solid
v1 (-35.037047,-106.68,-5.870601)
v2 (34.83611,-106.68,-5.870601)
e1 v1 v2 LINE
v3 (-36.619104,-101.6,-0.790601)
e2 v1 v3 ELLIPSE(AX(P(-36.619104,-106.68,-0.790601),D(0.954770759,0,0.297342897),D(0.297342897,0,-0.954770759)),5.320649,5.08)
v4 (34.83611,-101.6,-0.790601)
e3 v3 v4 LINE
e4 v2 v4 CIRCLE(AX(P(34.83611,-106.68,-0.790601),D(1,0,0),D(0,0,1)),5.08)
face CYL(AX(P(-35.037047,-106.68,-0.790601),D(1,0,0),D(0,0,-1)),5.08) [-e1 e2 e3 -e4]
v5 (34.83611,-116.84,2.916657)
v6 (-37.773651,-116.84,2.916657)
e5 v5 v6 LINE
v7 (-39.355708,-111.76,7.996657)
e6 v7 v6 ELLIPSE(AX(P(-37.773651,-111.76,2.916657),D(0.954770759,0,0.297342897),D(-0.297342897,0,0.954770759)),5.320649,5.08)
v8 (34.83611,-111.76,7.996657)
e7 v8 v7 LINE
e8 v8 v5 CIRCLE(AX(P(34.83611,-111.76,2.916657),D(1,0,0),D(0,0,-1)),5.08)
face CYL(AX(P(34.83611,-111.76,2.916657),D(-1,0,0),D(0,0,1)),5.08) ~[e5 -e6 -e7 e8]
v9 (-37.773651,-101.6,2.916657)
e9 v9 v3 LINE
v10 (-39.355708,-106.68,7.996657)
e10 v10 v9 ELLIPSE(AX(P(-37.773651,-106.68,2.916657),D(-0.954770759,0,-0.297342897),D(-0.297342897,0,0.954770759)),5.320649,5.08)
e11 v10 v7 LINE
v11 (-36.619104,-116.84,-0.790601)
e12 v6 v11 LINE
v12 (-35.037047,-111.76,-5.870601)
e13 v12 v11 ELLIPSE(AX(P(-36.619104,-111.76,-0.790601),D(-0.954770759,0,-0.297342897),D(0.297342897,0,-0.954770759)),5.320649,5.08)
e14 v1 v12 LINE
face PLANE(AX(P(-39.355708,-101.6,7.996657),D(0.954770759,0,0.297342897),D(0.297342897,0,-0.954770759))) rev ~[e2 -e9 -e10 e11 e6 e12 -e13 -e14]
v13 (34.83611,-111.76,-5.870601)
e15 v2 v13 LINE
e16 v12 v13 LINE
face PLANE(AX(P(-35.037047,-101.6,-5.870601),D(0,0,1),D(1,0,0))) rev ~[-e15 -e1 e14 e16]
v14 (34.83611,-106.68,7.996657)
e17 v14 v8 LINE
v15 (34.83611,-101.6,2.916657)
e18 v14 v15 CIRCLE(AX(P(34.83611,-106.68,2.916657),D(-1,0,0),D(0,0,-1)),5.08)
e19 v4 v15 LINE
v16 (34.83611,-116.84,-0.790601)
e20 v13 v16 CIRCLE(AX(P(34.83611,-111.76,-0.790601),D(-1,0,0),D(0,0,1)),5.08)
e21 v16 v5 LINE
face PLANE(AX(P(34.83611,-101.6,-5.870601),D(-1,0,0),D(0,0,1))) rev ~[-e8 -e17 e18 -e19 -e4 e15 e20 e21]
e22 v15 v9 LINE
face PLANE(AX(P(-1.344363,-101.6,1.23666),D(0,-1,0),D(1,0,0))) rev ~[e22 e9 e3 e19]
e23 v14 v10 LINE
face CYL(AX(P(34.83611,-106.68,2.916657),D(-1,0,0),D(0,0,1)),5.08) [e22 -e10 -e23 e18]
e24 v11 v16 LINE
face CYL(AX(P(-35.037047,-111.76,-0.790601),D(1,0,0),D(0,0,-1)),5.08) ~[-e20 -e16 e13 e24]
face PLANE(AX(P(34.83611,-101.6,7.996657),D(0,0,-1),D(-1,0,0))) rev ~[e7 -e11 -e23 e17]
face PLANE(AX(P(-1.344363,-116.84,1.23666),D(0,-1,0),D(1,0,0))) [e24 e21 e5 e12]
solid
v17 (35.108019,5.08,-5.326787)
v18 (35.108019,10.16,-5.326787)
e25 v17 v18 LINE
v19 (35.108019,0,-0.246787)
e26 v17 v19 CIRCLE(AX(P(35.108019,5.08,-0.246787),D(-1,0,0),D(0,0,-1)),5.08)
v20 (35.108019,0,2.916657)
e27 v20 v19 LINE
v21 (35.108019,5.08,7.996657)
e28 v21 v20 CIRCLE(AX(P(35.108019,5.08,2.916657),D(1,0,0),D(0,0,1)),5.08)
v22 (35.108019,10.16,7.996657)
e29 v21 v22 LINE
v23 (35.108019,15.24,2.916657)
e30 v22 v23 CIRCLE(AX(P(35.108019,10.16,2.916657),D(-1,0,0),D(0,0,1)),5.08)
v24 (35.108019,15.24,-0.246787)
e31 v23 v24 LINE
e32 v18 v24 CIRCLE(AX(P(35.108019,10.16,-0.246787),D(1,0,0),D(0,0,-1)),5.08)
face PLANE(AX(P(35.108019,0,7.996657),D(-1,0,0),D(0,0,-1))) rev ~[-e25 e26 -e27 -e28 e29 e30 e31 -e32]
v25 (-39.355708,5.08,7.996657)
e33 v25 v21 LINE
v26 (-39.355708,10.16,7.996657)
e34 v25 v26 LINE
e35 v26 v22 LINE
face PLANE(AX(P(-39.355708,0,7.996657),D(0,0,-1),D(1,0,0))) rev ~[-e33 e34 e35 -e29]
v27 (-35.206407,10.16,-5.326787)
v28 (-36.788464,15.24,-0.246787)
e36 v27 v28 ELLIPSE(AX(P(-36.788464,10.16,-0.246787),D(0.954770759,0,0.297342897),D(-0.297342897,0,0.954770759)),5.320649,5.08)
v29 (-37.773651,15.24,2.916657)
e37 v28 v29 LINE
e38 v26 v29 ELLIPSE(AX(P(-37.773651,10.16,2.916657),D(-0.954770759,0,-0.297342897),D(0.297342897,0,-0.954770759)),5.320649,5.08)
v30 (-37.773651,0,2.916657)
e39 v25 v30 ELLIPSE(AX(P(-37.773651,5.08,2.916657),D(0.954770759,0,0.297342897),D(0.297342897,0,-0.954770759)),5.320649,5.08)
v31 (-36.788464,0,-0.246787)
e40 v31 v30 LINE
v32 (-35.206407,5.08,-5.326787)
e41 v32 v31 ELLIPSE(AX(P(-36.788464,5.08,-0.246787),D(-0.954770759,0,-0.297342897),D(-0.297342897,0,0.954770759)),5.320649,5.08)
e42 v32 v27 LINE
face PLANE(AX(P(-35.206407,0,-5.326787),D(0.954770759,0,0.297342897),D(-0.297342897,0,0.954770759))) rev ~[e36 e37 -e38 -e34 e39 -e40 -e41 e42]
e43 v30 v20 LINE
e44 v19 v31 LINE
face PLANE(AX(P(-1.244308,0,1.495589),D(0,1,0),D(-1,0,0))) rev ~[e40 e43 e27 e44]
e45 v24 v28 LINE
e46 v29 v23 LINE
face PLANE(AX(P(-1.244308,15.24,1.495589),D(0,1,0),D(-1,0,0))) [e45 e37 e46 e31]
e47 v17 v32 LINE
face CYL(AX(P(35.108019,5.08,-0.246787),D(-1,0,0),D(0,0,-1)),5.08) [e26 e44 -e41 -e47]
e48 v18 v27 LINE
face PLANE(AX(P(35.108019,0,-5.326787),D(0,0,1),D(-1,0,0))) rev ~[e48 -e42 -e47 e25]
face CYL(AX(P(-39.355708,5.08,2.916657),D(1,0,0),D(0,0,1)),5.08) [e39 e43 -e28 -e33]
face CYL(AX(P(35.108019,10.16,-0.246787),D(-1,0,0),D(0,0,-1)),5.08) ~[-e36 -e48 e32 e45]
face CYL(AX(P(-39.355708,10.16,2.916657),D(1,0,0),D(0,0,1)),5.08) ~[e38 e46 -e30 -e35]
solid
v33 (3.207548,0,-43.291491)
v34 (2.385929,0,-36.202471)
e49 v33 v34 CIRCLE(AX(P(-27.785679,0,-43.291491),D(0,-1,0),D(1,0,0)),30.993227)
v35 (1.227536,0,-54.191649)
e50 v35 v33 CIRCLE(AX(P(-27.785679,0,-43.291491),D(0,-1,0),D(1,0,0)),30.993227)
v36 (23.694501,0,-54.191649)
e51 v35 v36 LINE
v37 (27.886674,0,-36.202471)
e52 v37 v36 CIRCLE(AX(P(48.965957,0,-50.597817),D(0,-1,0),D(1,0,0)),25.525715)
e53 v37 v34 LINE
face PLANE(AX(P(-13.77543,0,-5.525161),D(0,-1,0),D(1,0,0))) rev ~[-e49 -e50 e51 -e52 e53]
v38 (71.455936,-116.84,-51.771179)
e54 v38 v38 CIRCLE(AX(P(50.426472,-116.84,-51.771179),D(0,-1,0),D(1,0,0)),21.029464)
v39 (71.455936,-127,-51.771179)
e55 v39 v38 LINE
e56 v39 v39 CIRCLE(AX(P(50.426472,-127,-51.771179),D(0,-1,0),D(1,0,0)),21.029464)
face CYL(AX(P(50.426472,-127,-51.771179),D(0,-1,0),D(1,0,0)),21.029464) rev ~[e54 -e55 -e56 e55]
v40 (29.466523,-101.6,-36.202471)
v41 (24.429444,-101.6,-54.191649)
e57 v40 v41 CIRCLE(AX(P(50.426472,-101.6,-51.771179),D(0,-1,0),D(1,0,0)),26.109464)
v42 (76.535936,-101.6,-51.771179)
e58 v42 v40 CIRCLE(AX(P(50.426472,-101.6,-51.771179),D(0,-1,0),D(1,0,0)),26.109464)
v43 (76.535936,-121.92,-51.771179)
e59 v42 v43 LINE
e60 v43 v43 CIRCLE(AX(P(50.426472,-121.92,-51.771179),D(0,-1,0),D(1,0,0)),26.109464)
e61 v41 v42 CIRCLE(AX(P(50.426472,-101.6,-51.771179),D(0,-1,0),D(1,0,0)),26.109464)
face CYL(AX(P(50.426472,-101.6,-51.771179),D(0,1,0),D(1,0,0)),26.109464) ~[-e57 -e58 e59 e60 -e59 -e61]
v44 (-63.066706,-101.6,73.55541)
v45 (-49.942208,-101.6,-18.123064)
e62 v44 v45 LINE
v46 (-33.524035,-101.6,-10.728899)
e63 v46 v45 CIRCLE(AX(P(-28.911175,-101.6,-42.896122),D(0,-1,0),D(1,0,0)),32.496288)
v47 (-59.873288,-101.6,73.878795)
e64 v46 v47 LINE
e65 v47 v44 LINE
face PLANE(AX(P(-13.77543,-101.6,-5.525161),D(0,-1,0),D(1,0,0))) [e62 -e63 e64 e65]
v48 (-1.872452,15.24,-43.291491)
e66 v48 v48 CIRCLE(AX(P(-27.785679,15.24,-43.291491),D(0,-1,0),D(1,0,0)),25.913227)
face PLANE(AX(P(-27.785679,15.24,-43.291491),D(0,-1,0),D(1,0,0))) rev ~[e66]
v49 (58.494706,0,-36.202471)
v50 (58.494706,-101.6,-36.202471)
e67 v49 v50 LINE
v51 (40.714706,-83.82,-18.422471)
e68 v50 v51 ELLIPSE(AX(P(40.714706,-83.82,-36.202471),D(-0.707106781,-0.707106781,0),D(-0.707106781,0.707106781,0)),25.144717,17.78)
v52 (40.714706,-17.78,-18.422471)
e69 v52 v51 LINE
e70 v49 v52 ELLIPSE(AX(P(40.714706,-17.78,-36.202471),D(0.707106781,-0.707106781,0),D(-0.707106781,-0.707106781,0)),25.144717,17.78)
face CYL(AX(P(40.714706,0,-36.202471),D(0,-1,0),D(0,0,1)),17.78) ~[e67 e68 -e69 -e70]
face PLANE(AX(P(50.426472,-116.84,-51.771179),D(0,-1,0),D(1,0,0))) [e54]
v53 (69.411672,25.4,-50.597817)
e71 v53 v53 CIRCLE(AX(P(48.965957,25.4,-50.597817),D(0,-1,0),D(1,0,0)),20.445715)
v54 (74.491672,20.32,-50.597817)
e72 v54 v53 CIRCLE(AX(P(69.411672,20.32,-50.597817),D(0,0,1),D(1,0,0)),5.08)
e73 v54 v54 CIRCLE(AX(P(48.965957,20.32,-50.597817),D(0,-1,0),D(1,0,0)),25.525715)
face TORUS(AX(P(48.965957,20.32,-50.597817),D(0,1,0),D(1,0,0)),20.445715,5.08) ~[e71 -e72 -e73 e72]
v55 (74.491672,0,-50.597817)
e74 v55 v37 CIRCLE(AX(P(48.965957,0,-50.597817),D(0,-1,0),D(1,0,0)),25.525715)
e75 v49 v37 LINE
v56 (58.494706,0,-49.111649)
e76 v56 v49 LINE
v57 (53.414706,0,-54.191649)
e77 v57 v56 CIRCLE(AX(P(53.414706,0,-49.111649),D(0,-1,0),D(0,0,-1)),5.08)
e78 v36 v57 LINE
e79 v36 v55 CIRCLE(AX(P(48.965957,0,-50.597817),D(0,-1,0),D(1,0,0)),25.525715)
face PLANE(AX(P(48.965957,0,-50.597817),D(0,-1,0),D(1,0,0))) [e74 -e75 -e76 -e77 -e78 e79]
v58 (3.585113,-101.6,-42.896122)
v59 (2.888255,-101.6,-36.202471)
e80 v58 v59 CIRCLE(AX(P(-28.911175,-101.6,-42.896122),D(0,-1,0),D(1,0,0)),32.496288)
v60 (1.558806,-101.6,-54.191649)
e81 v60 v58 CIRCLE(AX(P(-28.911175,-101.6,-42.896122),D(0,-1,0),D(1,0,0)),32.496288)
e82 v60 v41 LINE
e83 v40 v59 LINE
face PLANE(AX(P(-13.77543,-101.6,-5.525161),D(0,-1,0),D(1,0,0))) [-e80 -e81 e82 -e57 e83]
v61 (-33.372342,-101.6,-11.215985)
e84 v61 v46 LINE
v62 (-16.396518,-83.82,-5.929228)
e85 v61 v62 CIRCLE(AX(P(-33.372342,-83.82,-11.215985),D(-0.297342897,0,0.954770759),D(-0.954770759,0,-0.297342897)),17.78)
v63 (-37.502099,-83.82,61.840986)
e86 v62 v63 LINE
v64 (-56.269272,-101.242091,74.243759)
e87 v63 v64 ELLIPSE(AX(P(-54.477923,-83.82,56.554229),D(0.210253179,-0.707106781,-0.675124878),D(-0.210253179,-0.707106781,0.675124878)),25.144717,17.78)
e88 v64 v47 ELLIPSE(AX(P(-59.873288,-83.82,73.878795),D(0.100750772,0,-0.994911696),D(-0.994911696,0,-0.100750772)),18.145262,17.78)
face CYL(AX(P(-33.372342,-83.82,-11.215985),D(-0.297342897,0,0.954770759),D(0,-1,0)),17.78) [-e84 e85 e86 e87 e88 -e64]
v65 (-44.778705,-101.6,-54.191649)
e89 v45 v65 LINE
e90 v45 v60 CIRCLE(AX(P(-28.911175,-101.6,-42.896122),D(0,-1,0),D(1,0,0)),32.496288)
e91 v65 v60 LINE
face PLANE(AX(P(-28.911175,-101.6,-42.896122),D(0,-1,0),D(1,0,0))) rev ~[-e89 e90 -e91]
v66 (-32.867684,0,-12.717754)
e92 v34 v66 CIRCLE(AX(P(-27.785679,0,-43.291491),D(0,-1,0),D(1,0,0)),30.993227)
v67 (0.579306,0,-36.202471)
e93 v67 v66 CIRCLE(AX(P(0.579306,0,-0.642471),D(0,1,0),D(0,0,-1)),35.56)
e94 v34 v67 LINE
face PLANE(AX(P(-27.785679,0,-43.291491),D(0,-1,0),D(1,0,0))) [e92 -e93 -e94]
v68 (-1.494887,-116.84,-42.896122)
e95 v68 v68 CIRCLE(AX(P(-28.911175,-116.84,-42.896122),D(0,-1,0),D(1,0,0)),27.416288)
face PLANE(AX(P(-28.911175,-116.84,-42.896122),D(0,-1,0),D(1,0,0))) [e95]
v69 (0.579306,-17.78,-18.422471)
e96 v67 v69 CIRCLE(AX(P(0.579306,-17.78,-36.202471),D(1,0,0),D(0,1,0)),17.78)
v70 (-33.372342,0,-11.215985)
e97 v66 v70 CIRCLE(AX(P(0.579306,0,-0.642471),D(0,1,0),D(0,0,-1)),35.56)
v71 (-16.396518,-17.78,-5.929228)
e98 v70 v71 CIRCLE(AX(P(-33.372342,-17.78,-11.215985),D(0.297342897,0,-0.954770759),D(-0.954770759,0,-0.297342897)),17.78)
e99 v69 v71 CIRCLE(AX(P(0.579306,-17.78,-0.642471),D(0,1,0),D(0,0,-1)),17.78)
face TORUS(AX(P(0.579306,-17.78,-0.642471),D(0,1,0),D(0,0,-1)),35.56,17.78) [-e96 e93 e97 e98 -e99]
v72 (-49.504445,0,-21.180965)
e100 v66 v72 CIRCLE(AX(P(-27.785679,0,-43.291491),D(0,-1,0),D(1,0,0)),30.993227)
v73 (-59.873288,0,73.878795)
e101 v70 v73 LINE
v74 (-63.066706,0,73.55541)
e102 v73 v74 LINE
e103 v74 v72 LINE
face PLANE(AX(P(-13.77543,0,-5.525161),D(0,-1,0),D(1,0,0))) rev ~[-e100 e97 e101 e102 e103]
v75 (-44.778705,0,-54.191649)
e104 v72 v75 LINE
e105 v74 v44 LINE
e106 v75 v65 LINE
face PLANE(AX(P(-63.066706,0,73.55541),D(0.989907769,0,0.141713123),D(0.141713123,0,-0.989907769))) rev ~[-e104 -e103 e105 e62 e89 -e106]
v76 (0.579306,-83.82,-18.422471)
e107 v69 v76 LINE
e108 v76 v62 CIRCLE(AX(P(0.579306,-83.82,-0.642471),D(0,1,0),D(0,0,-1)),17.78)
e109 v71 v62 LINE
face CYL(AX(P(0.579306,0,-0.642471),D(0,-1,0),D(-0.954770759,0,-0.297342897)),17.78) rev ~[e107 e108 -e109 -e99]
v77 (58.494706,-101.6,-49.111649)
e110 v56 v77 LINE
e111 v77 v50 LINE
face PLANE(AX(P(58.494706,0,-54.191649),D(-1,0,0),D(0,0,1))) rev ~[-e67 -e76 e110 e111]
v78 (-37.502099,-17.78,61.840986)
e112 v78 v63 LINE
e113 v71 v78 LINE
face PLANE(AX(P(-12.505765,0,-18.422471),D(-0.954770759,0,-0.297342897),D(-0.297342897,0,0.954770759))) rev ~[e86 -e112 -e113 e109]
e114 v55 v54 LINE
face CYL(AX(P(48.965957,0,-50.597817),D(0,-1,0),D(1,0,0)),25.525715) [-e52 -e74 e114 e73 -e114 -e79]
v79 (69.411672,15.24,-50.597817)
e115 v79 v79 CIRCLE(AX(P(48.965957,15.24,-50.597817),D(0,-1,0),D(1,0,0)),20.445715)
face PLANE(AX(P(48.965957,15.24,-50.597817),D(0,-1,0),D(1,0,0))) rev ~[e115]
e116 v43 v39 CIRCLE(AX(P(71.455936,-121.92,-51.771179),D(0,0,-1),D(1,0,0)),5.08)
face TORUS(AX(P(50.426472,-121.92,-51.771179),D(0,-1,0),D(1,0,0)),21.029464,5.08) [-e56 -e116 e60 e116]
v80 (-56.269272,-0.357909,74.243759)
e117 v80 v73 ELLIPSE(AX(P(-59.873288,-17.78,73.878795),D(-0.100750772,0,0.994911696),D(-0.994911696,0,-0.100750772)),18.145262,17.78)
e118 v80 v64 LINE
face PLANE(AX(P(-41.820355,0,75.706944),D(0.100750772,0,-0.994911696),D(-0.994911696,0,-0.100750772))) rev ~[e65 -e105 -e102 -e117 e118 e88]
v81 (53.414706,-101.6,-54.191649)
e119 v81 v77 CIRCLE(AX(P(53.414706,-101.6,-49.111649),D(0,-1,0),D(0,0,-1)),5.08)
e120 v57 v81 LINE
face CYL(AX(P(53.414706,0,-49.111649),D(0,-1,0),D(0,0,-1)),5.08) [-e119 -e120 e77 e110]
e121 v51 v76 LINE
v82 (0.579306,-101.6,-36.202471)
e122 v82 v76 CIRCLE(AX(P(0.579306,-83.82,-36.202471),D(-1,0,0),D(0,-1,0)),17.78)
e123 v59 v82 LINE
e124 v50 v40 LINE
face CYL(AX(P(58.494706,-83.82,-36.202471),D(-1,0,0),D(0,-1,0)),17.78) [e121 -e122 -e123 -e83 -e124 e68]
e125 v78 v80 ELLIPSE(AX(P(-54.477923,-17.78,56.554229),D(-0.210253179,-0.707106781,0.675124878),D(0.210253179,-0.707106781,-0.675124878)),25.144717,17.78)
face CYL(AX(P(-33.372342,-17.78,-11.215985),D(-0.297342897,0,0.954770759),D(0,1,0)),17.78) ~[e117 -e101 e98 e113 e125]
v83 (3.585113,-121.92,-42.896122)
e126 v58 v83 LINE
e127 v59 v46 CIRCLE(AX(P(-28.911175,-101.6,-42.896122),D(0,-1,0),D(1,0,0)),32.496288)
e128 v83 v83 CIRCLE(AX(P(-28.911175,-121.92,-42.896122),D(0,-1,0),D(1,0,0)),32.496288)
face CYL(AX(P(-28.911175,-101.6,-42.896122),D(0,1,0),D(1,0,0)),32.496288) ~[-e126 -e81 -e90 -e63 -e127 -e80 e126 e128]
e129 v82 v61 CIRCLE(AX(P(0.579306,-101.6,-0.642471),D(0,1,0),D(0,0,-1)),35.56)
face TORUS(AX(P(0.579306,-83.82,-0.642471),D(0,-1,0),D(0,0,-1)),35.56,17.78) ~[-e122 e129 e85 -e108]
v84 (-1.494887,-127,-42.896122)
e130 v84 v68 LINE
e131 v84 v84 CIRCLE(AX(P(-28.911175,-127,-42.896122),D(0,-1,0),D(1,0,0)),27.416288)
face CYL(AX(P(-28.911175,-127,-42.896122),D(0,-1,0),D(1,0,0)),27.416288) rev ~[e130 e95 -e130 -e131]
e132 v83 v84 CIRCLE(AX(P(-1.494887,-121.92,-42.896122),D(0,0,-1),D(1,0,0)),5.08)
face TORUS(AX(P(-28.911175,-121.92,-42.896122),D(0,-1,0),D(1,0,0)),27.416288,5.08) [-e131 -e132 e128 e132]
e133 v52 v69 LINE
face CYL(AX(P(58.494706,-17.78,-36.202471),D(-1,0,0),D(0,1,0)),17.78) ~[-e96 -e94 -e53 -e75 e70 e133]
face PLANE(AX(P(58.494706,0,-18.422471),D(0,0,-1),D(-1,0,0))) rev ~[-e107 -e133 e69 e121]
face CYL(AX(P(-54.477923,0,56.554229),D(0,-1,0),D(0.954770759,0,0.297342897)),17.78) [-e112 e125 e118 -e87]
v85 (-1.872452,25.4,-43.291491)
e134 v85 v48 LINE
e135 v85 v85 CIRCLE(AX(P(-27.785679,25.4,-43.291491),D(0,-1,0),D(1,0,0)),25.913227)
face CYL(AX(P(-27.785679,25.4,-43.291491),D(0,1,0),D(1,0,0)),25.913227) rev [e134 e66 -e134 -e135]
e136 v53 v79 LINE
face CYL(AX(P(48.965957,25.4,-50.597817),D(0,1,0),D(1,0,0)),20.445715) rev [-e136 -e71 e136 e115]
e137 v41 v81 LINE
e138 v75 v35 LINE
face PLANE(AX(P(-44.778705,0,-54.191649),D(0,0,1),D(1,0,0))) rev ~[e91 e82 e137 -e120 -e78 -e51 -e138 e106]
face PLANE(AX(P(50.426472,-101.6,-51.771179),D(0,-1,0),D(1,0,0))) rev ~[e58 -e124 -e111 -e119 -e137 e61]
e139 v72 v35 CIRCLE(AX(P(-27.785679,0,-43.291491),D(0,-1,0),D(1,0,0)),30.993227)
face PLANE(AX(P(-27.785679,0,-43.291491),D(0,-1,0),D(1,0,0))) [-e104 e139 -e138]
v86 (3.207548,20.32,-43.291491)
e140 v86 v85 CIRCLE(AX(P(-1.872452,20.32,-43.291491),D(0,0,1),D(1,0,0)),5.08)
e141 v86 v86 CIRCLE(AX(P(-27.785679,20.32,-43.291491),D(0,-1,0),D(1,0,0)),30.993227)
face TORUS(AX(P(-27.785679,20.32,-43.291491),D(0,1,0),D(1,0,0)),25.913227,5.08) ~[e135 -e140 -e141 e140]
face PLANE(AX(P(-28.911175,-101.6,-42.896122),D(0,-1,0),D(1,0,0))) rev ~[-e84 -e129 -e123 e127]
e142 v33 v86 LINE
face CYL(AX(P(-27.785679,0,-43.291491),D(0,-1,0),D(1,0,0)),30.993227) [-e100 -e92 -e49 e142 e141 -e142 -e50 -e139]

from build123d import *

# Parameters (mm, degrees)
F1_DEPTH  = 101.6
F2_F1_R   = 17.78
F2_F2_R   = 17.78
F3_R      = 25.5257149729
F3_R_2    = 30.9932269238
F4_DEPTH  = 25.4
F5_R      = 32.4962877328
F5_R_2    = 26.1094641949
F6_DEPTH  = 25.4
F8_DEPTH  = 15.24
F9_R      = 5.08
F11_DEPTH = 15.24
F12_R     = 5.08
F12_2_R   = 5.08
F13_R     = 5.08
F14_DEPTH = 10.16
F15_DEPTH = 10.16
F16_DEPTH = 10.16


with BuildPart() as f1:
    # F0 (on Front) → F1 (new body)
    with BuildSketch(Plane.XZ):
        Polygon((-12.505765073, -18.4224713594), (-41.8203547597, 75.7069438696), (-63.0667060614, 73.5554099083), (-44.7787046432, -54.1916489601), (58.4947057068, -54.1916489601), (58.4947057068, -18.4224713594), align=None)
    extrude(amount=F1_DEPTH)

    # F2: fillet of radius 17.78 on 5 edges, made by hand

    # F2_f1
    f2_f1_edges = [f1.edges().sort_by_distance(p)[0] for p in [
        (-12.505765073, -50.8, -18.4224713594),
    ]]
    fillet(f2_f1_edges, radius=F2_F1_R)

    # F2_f2
    f2_f2_edges = [f1.edges().sort_by_distance(p)[0] for p in [
        (29.5370058814, -101.6, -18.4224713594),
        (29.5370058814, 0, -18.4224713594),
        (58.4947057068, -50.8, -18.4224713594),
        (-41.8203547597, -50.8, 75.7069438696),
        (-9.9594288223, 0, -14.9625086208),
        (-9.9594288223, -101.6, -14.9625086208),
    ]]
    fillet(f2_f2_edges, radius=F2_F2_R)

    # F3 (on Front) → F4 (join)
    with BuildSketch(Plane.XZ):
        with Locations((48.9659570158, -50.5978167057)):
            Circle(F3_R)
        with Locations((-27.7856793255, -43.291490525)):
            Circle(F3_R_2)
    extrude(amount=-F4_DEPTH)

    # F5 (on face) → F6 (join)
    with BuildSketch(Plane.XZ.offset(101.6)):
        with Locations((-28.9111752063, -42.8961217403)):
            Circle(F5_R)
        with Locations((50.4264719784, -51.7711788416)):
            Circle(F5_R_2)
    extrude(amount=F6_DEPTH)

    # F13
    f13_edges = [f1.edges().sort_by_distance(p)[0] for p in [
        (-61.407463, -127, -42.896122),
        (24.317008, -127, -51.771179),
        (23.440242, 25.4, -50.597817),
        (-58.778906, 25.4, -43.291491),
        (58.494706, -50.8, -54.191649),
    ]]
    fillet(f13_edges, radius=F13_R)

    # F14 (cut): a face of the model
    f14_faces = [f1.faces().sort_by_distance(p)[0] for p in [
        (50.4264719784, -127, -51.7711788416),
    ]]
    extrude(f14_faces, amount=-F14_DEPTH, mode=Mode.SUBTRACT)

    # F15 (cut): faces of the model
    f15_faces = [f1.faces().sort_by_distance(p)[0] for p in [
        (48.9659570158, 25.4, -50.5978167057),
        (-27.7856793255, 25.4, -43.291490525),
    ]]
    extrude(f15_faces, amount=-F15_DEPTH, mode=Mode.SUBTRACT)

    # F16 (cut): a face of the model
    f16_faces = [f1.faces().sort_by_distance(p)[0] for p in [
        (-28.9111752063, -127, -42.8961217403),
    ]]
    extrude(f16_faces, amount=-F16_DEPTH, mode=Mode.SUBTRACT)


with BuildPart() as f8:
    # F7 (on face) → F8 (new body)
    with BuildSketch(Plane.XZ.offset(101.6)):
        Polygon((34.8361097276, 7.9966569319), (-39.355707759, 7.9966569319), (-35.0370473262, -5.8706011623), (34.8361097276, -5.8706011623), align=None)
    extrude(amount=F8_DEPTH)

    # F9
    f9_edges = [f8.edges().sort_by_distance(p)[0] for p in [
        (-2.259799, -116.84, 7.996657),
        (-0.100469, -116.84, -5.870601),
        (-2.259799, -101.6, 7.996657),
    ]]
    fillet(f9_edges, radius=F9_R)

    # F12#2
    f12_2_edges = [f8.edges().sort_by_distance(p)[0] for p in [
        (-0.100469, -101.6, -5.870601),
    ]]
    fillet(f12_2_edges, radius=F12_2_R)


with BuildPart() as f11:
    # F10 (on face) → F11 (new body)
    with BuildSketch(Plane(origin=(0, 0, 0), x_dir=(-1, 0, 0), z_dir=(0, 1, 0))):
        Polygon((39.355707759, 7.9966569319), (-35.1080186665, 7.9966569319), (-35.1080186665, -5.3267870098), (35.206406593, -5.3267870098), align=None)
    extrude(amount=F11_DEPTH)

    # F12
    f12_edges = [f11.edges().sort_by_distance(p)[0] for p in [
        (-2.123845, 15.24, 7.996657),
        (-2.123845, 0, 7.996657),
        (-0.049194, 15.24, -5.326787),
        (-0.049194, 0, -5.326787),
    ]]
    fillet(f12_edges, radius=F12_R)


solid = Compound([f1.part, f8.part, f11.part])
